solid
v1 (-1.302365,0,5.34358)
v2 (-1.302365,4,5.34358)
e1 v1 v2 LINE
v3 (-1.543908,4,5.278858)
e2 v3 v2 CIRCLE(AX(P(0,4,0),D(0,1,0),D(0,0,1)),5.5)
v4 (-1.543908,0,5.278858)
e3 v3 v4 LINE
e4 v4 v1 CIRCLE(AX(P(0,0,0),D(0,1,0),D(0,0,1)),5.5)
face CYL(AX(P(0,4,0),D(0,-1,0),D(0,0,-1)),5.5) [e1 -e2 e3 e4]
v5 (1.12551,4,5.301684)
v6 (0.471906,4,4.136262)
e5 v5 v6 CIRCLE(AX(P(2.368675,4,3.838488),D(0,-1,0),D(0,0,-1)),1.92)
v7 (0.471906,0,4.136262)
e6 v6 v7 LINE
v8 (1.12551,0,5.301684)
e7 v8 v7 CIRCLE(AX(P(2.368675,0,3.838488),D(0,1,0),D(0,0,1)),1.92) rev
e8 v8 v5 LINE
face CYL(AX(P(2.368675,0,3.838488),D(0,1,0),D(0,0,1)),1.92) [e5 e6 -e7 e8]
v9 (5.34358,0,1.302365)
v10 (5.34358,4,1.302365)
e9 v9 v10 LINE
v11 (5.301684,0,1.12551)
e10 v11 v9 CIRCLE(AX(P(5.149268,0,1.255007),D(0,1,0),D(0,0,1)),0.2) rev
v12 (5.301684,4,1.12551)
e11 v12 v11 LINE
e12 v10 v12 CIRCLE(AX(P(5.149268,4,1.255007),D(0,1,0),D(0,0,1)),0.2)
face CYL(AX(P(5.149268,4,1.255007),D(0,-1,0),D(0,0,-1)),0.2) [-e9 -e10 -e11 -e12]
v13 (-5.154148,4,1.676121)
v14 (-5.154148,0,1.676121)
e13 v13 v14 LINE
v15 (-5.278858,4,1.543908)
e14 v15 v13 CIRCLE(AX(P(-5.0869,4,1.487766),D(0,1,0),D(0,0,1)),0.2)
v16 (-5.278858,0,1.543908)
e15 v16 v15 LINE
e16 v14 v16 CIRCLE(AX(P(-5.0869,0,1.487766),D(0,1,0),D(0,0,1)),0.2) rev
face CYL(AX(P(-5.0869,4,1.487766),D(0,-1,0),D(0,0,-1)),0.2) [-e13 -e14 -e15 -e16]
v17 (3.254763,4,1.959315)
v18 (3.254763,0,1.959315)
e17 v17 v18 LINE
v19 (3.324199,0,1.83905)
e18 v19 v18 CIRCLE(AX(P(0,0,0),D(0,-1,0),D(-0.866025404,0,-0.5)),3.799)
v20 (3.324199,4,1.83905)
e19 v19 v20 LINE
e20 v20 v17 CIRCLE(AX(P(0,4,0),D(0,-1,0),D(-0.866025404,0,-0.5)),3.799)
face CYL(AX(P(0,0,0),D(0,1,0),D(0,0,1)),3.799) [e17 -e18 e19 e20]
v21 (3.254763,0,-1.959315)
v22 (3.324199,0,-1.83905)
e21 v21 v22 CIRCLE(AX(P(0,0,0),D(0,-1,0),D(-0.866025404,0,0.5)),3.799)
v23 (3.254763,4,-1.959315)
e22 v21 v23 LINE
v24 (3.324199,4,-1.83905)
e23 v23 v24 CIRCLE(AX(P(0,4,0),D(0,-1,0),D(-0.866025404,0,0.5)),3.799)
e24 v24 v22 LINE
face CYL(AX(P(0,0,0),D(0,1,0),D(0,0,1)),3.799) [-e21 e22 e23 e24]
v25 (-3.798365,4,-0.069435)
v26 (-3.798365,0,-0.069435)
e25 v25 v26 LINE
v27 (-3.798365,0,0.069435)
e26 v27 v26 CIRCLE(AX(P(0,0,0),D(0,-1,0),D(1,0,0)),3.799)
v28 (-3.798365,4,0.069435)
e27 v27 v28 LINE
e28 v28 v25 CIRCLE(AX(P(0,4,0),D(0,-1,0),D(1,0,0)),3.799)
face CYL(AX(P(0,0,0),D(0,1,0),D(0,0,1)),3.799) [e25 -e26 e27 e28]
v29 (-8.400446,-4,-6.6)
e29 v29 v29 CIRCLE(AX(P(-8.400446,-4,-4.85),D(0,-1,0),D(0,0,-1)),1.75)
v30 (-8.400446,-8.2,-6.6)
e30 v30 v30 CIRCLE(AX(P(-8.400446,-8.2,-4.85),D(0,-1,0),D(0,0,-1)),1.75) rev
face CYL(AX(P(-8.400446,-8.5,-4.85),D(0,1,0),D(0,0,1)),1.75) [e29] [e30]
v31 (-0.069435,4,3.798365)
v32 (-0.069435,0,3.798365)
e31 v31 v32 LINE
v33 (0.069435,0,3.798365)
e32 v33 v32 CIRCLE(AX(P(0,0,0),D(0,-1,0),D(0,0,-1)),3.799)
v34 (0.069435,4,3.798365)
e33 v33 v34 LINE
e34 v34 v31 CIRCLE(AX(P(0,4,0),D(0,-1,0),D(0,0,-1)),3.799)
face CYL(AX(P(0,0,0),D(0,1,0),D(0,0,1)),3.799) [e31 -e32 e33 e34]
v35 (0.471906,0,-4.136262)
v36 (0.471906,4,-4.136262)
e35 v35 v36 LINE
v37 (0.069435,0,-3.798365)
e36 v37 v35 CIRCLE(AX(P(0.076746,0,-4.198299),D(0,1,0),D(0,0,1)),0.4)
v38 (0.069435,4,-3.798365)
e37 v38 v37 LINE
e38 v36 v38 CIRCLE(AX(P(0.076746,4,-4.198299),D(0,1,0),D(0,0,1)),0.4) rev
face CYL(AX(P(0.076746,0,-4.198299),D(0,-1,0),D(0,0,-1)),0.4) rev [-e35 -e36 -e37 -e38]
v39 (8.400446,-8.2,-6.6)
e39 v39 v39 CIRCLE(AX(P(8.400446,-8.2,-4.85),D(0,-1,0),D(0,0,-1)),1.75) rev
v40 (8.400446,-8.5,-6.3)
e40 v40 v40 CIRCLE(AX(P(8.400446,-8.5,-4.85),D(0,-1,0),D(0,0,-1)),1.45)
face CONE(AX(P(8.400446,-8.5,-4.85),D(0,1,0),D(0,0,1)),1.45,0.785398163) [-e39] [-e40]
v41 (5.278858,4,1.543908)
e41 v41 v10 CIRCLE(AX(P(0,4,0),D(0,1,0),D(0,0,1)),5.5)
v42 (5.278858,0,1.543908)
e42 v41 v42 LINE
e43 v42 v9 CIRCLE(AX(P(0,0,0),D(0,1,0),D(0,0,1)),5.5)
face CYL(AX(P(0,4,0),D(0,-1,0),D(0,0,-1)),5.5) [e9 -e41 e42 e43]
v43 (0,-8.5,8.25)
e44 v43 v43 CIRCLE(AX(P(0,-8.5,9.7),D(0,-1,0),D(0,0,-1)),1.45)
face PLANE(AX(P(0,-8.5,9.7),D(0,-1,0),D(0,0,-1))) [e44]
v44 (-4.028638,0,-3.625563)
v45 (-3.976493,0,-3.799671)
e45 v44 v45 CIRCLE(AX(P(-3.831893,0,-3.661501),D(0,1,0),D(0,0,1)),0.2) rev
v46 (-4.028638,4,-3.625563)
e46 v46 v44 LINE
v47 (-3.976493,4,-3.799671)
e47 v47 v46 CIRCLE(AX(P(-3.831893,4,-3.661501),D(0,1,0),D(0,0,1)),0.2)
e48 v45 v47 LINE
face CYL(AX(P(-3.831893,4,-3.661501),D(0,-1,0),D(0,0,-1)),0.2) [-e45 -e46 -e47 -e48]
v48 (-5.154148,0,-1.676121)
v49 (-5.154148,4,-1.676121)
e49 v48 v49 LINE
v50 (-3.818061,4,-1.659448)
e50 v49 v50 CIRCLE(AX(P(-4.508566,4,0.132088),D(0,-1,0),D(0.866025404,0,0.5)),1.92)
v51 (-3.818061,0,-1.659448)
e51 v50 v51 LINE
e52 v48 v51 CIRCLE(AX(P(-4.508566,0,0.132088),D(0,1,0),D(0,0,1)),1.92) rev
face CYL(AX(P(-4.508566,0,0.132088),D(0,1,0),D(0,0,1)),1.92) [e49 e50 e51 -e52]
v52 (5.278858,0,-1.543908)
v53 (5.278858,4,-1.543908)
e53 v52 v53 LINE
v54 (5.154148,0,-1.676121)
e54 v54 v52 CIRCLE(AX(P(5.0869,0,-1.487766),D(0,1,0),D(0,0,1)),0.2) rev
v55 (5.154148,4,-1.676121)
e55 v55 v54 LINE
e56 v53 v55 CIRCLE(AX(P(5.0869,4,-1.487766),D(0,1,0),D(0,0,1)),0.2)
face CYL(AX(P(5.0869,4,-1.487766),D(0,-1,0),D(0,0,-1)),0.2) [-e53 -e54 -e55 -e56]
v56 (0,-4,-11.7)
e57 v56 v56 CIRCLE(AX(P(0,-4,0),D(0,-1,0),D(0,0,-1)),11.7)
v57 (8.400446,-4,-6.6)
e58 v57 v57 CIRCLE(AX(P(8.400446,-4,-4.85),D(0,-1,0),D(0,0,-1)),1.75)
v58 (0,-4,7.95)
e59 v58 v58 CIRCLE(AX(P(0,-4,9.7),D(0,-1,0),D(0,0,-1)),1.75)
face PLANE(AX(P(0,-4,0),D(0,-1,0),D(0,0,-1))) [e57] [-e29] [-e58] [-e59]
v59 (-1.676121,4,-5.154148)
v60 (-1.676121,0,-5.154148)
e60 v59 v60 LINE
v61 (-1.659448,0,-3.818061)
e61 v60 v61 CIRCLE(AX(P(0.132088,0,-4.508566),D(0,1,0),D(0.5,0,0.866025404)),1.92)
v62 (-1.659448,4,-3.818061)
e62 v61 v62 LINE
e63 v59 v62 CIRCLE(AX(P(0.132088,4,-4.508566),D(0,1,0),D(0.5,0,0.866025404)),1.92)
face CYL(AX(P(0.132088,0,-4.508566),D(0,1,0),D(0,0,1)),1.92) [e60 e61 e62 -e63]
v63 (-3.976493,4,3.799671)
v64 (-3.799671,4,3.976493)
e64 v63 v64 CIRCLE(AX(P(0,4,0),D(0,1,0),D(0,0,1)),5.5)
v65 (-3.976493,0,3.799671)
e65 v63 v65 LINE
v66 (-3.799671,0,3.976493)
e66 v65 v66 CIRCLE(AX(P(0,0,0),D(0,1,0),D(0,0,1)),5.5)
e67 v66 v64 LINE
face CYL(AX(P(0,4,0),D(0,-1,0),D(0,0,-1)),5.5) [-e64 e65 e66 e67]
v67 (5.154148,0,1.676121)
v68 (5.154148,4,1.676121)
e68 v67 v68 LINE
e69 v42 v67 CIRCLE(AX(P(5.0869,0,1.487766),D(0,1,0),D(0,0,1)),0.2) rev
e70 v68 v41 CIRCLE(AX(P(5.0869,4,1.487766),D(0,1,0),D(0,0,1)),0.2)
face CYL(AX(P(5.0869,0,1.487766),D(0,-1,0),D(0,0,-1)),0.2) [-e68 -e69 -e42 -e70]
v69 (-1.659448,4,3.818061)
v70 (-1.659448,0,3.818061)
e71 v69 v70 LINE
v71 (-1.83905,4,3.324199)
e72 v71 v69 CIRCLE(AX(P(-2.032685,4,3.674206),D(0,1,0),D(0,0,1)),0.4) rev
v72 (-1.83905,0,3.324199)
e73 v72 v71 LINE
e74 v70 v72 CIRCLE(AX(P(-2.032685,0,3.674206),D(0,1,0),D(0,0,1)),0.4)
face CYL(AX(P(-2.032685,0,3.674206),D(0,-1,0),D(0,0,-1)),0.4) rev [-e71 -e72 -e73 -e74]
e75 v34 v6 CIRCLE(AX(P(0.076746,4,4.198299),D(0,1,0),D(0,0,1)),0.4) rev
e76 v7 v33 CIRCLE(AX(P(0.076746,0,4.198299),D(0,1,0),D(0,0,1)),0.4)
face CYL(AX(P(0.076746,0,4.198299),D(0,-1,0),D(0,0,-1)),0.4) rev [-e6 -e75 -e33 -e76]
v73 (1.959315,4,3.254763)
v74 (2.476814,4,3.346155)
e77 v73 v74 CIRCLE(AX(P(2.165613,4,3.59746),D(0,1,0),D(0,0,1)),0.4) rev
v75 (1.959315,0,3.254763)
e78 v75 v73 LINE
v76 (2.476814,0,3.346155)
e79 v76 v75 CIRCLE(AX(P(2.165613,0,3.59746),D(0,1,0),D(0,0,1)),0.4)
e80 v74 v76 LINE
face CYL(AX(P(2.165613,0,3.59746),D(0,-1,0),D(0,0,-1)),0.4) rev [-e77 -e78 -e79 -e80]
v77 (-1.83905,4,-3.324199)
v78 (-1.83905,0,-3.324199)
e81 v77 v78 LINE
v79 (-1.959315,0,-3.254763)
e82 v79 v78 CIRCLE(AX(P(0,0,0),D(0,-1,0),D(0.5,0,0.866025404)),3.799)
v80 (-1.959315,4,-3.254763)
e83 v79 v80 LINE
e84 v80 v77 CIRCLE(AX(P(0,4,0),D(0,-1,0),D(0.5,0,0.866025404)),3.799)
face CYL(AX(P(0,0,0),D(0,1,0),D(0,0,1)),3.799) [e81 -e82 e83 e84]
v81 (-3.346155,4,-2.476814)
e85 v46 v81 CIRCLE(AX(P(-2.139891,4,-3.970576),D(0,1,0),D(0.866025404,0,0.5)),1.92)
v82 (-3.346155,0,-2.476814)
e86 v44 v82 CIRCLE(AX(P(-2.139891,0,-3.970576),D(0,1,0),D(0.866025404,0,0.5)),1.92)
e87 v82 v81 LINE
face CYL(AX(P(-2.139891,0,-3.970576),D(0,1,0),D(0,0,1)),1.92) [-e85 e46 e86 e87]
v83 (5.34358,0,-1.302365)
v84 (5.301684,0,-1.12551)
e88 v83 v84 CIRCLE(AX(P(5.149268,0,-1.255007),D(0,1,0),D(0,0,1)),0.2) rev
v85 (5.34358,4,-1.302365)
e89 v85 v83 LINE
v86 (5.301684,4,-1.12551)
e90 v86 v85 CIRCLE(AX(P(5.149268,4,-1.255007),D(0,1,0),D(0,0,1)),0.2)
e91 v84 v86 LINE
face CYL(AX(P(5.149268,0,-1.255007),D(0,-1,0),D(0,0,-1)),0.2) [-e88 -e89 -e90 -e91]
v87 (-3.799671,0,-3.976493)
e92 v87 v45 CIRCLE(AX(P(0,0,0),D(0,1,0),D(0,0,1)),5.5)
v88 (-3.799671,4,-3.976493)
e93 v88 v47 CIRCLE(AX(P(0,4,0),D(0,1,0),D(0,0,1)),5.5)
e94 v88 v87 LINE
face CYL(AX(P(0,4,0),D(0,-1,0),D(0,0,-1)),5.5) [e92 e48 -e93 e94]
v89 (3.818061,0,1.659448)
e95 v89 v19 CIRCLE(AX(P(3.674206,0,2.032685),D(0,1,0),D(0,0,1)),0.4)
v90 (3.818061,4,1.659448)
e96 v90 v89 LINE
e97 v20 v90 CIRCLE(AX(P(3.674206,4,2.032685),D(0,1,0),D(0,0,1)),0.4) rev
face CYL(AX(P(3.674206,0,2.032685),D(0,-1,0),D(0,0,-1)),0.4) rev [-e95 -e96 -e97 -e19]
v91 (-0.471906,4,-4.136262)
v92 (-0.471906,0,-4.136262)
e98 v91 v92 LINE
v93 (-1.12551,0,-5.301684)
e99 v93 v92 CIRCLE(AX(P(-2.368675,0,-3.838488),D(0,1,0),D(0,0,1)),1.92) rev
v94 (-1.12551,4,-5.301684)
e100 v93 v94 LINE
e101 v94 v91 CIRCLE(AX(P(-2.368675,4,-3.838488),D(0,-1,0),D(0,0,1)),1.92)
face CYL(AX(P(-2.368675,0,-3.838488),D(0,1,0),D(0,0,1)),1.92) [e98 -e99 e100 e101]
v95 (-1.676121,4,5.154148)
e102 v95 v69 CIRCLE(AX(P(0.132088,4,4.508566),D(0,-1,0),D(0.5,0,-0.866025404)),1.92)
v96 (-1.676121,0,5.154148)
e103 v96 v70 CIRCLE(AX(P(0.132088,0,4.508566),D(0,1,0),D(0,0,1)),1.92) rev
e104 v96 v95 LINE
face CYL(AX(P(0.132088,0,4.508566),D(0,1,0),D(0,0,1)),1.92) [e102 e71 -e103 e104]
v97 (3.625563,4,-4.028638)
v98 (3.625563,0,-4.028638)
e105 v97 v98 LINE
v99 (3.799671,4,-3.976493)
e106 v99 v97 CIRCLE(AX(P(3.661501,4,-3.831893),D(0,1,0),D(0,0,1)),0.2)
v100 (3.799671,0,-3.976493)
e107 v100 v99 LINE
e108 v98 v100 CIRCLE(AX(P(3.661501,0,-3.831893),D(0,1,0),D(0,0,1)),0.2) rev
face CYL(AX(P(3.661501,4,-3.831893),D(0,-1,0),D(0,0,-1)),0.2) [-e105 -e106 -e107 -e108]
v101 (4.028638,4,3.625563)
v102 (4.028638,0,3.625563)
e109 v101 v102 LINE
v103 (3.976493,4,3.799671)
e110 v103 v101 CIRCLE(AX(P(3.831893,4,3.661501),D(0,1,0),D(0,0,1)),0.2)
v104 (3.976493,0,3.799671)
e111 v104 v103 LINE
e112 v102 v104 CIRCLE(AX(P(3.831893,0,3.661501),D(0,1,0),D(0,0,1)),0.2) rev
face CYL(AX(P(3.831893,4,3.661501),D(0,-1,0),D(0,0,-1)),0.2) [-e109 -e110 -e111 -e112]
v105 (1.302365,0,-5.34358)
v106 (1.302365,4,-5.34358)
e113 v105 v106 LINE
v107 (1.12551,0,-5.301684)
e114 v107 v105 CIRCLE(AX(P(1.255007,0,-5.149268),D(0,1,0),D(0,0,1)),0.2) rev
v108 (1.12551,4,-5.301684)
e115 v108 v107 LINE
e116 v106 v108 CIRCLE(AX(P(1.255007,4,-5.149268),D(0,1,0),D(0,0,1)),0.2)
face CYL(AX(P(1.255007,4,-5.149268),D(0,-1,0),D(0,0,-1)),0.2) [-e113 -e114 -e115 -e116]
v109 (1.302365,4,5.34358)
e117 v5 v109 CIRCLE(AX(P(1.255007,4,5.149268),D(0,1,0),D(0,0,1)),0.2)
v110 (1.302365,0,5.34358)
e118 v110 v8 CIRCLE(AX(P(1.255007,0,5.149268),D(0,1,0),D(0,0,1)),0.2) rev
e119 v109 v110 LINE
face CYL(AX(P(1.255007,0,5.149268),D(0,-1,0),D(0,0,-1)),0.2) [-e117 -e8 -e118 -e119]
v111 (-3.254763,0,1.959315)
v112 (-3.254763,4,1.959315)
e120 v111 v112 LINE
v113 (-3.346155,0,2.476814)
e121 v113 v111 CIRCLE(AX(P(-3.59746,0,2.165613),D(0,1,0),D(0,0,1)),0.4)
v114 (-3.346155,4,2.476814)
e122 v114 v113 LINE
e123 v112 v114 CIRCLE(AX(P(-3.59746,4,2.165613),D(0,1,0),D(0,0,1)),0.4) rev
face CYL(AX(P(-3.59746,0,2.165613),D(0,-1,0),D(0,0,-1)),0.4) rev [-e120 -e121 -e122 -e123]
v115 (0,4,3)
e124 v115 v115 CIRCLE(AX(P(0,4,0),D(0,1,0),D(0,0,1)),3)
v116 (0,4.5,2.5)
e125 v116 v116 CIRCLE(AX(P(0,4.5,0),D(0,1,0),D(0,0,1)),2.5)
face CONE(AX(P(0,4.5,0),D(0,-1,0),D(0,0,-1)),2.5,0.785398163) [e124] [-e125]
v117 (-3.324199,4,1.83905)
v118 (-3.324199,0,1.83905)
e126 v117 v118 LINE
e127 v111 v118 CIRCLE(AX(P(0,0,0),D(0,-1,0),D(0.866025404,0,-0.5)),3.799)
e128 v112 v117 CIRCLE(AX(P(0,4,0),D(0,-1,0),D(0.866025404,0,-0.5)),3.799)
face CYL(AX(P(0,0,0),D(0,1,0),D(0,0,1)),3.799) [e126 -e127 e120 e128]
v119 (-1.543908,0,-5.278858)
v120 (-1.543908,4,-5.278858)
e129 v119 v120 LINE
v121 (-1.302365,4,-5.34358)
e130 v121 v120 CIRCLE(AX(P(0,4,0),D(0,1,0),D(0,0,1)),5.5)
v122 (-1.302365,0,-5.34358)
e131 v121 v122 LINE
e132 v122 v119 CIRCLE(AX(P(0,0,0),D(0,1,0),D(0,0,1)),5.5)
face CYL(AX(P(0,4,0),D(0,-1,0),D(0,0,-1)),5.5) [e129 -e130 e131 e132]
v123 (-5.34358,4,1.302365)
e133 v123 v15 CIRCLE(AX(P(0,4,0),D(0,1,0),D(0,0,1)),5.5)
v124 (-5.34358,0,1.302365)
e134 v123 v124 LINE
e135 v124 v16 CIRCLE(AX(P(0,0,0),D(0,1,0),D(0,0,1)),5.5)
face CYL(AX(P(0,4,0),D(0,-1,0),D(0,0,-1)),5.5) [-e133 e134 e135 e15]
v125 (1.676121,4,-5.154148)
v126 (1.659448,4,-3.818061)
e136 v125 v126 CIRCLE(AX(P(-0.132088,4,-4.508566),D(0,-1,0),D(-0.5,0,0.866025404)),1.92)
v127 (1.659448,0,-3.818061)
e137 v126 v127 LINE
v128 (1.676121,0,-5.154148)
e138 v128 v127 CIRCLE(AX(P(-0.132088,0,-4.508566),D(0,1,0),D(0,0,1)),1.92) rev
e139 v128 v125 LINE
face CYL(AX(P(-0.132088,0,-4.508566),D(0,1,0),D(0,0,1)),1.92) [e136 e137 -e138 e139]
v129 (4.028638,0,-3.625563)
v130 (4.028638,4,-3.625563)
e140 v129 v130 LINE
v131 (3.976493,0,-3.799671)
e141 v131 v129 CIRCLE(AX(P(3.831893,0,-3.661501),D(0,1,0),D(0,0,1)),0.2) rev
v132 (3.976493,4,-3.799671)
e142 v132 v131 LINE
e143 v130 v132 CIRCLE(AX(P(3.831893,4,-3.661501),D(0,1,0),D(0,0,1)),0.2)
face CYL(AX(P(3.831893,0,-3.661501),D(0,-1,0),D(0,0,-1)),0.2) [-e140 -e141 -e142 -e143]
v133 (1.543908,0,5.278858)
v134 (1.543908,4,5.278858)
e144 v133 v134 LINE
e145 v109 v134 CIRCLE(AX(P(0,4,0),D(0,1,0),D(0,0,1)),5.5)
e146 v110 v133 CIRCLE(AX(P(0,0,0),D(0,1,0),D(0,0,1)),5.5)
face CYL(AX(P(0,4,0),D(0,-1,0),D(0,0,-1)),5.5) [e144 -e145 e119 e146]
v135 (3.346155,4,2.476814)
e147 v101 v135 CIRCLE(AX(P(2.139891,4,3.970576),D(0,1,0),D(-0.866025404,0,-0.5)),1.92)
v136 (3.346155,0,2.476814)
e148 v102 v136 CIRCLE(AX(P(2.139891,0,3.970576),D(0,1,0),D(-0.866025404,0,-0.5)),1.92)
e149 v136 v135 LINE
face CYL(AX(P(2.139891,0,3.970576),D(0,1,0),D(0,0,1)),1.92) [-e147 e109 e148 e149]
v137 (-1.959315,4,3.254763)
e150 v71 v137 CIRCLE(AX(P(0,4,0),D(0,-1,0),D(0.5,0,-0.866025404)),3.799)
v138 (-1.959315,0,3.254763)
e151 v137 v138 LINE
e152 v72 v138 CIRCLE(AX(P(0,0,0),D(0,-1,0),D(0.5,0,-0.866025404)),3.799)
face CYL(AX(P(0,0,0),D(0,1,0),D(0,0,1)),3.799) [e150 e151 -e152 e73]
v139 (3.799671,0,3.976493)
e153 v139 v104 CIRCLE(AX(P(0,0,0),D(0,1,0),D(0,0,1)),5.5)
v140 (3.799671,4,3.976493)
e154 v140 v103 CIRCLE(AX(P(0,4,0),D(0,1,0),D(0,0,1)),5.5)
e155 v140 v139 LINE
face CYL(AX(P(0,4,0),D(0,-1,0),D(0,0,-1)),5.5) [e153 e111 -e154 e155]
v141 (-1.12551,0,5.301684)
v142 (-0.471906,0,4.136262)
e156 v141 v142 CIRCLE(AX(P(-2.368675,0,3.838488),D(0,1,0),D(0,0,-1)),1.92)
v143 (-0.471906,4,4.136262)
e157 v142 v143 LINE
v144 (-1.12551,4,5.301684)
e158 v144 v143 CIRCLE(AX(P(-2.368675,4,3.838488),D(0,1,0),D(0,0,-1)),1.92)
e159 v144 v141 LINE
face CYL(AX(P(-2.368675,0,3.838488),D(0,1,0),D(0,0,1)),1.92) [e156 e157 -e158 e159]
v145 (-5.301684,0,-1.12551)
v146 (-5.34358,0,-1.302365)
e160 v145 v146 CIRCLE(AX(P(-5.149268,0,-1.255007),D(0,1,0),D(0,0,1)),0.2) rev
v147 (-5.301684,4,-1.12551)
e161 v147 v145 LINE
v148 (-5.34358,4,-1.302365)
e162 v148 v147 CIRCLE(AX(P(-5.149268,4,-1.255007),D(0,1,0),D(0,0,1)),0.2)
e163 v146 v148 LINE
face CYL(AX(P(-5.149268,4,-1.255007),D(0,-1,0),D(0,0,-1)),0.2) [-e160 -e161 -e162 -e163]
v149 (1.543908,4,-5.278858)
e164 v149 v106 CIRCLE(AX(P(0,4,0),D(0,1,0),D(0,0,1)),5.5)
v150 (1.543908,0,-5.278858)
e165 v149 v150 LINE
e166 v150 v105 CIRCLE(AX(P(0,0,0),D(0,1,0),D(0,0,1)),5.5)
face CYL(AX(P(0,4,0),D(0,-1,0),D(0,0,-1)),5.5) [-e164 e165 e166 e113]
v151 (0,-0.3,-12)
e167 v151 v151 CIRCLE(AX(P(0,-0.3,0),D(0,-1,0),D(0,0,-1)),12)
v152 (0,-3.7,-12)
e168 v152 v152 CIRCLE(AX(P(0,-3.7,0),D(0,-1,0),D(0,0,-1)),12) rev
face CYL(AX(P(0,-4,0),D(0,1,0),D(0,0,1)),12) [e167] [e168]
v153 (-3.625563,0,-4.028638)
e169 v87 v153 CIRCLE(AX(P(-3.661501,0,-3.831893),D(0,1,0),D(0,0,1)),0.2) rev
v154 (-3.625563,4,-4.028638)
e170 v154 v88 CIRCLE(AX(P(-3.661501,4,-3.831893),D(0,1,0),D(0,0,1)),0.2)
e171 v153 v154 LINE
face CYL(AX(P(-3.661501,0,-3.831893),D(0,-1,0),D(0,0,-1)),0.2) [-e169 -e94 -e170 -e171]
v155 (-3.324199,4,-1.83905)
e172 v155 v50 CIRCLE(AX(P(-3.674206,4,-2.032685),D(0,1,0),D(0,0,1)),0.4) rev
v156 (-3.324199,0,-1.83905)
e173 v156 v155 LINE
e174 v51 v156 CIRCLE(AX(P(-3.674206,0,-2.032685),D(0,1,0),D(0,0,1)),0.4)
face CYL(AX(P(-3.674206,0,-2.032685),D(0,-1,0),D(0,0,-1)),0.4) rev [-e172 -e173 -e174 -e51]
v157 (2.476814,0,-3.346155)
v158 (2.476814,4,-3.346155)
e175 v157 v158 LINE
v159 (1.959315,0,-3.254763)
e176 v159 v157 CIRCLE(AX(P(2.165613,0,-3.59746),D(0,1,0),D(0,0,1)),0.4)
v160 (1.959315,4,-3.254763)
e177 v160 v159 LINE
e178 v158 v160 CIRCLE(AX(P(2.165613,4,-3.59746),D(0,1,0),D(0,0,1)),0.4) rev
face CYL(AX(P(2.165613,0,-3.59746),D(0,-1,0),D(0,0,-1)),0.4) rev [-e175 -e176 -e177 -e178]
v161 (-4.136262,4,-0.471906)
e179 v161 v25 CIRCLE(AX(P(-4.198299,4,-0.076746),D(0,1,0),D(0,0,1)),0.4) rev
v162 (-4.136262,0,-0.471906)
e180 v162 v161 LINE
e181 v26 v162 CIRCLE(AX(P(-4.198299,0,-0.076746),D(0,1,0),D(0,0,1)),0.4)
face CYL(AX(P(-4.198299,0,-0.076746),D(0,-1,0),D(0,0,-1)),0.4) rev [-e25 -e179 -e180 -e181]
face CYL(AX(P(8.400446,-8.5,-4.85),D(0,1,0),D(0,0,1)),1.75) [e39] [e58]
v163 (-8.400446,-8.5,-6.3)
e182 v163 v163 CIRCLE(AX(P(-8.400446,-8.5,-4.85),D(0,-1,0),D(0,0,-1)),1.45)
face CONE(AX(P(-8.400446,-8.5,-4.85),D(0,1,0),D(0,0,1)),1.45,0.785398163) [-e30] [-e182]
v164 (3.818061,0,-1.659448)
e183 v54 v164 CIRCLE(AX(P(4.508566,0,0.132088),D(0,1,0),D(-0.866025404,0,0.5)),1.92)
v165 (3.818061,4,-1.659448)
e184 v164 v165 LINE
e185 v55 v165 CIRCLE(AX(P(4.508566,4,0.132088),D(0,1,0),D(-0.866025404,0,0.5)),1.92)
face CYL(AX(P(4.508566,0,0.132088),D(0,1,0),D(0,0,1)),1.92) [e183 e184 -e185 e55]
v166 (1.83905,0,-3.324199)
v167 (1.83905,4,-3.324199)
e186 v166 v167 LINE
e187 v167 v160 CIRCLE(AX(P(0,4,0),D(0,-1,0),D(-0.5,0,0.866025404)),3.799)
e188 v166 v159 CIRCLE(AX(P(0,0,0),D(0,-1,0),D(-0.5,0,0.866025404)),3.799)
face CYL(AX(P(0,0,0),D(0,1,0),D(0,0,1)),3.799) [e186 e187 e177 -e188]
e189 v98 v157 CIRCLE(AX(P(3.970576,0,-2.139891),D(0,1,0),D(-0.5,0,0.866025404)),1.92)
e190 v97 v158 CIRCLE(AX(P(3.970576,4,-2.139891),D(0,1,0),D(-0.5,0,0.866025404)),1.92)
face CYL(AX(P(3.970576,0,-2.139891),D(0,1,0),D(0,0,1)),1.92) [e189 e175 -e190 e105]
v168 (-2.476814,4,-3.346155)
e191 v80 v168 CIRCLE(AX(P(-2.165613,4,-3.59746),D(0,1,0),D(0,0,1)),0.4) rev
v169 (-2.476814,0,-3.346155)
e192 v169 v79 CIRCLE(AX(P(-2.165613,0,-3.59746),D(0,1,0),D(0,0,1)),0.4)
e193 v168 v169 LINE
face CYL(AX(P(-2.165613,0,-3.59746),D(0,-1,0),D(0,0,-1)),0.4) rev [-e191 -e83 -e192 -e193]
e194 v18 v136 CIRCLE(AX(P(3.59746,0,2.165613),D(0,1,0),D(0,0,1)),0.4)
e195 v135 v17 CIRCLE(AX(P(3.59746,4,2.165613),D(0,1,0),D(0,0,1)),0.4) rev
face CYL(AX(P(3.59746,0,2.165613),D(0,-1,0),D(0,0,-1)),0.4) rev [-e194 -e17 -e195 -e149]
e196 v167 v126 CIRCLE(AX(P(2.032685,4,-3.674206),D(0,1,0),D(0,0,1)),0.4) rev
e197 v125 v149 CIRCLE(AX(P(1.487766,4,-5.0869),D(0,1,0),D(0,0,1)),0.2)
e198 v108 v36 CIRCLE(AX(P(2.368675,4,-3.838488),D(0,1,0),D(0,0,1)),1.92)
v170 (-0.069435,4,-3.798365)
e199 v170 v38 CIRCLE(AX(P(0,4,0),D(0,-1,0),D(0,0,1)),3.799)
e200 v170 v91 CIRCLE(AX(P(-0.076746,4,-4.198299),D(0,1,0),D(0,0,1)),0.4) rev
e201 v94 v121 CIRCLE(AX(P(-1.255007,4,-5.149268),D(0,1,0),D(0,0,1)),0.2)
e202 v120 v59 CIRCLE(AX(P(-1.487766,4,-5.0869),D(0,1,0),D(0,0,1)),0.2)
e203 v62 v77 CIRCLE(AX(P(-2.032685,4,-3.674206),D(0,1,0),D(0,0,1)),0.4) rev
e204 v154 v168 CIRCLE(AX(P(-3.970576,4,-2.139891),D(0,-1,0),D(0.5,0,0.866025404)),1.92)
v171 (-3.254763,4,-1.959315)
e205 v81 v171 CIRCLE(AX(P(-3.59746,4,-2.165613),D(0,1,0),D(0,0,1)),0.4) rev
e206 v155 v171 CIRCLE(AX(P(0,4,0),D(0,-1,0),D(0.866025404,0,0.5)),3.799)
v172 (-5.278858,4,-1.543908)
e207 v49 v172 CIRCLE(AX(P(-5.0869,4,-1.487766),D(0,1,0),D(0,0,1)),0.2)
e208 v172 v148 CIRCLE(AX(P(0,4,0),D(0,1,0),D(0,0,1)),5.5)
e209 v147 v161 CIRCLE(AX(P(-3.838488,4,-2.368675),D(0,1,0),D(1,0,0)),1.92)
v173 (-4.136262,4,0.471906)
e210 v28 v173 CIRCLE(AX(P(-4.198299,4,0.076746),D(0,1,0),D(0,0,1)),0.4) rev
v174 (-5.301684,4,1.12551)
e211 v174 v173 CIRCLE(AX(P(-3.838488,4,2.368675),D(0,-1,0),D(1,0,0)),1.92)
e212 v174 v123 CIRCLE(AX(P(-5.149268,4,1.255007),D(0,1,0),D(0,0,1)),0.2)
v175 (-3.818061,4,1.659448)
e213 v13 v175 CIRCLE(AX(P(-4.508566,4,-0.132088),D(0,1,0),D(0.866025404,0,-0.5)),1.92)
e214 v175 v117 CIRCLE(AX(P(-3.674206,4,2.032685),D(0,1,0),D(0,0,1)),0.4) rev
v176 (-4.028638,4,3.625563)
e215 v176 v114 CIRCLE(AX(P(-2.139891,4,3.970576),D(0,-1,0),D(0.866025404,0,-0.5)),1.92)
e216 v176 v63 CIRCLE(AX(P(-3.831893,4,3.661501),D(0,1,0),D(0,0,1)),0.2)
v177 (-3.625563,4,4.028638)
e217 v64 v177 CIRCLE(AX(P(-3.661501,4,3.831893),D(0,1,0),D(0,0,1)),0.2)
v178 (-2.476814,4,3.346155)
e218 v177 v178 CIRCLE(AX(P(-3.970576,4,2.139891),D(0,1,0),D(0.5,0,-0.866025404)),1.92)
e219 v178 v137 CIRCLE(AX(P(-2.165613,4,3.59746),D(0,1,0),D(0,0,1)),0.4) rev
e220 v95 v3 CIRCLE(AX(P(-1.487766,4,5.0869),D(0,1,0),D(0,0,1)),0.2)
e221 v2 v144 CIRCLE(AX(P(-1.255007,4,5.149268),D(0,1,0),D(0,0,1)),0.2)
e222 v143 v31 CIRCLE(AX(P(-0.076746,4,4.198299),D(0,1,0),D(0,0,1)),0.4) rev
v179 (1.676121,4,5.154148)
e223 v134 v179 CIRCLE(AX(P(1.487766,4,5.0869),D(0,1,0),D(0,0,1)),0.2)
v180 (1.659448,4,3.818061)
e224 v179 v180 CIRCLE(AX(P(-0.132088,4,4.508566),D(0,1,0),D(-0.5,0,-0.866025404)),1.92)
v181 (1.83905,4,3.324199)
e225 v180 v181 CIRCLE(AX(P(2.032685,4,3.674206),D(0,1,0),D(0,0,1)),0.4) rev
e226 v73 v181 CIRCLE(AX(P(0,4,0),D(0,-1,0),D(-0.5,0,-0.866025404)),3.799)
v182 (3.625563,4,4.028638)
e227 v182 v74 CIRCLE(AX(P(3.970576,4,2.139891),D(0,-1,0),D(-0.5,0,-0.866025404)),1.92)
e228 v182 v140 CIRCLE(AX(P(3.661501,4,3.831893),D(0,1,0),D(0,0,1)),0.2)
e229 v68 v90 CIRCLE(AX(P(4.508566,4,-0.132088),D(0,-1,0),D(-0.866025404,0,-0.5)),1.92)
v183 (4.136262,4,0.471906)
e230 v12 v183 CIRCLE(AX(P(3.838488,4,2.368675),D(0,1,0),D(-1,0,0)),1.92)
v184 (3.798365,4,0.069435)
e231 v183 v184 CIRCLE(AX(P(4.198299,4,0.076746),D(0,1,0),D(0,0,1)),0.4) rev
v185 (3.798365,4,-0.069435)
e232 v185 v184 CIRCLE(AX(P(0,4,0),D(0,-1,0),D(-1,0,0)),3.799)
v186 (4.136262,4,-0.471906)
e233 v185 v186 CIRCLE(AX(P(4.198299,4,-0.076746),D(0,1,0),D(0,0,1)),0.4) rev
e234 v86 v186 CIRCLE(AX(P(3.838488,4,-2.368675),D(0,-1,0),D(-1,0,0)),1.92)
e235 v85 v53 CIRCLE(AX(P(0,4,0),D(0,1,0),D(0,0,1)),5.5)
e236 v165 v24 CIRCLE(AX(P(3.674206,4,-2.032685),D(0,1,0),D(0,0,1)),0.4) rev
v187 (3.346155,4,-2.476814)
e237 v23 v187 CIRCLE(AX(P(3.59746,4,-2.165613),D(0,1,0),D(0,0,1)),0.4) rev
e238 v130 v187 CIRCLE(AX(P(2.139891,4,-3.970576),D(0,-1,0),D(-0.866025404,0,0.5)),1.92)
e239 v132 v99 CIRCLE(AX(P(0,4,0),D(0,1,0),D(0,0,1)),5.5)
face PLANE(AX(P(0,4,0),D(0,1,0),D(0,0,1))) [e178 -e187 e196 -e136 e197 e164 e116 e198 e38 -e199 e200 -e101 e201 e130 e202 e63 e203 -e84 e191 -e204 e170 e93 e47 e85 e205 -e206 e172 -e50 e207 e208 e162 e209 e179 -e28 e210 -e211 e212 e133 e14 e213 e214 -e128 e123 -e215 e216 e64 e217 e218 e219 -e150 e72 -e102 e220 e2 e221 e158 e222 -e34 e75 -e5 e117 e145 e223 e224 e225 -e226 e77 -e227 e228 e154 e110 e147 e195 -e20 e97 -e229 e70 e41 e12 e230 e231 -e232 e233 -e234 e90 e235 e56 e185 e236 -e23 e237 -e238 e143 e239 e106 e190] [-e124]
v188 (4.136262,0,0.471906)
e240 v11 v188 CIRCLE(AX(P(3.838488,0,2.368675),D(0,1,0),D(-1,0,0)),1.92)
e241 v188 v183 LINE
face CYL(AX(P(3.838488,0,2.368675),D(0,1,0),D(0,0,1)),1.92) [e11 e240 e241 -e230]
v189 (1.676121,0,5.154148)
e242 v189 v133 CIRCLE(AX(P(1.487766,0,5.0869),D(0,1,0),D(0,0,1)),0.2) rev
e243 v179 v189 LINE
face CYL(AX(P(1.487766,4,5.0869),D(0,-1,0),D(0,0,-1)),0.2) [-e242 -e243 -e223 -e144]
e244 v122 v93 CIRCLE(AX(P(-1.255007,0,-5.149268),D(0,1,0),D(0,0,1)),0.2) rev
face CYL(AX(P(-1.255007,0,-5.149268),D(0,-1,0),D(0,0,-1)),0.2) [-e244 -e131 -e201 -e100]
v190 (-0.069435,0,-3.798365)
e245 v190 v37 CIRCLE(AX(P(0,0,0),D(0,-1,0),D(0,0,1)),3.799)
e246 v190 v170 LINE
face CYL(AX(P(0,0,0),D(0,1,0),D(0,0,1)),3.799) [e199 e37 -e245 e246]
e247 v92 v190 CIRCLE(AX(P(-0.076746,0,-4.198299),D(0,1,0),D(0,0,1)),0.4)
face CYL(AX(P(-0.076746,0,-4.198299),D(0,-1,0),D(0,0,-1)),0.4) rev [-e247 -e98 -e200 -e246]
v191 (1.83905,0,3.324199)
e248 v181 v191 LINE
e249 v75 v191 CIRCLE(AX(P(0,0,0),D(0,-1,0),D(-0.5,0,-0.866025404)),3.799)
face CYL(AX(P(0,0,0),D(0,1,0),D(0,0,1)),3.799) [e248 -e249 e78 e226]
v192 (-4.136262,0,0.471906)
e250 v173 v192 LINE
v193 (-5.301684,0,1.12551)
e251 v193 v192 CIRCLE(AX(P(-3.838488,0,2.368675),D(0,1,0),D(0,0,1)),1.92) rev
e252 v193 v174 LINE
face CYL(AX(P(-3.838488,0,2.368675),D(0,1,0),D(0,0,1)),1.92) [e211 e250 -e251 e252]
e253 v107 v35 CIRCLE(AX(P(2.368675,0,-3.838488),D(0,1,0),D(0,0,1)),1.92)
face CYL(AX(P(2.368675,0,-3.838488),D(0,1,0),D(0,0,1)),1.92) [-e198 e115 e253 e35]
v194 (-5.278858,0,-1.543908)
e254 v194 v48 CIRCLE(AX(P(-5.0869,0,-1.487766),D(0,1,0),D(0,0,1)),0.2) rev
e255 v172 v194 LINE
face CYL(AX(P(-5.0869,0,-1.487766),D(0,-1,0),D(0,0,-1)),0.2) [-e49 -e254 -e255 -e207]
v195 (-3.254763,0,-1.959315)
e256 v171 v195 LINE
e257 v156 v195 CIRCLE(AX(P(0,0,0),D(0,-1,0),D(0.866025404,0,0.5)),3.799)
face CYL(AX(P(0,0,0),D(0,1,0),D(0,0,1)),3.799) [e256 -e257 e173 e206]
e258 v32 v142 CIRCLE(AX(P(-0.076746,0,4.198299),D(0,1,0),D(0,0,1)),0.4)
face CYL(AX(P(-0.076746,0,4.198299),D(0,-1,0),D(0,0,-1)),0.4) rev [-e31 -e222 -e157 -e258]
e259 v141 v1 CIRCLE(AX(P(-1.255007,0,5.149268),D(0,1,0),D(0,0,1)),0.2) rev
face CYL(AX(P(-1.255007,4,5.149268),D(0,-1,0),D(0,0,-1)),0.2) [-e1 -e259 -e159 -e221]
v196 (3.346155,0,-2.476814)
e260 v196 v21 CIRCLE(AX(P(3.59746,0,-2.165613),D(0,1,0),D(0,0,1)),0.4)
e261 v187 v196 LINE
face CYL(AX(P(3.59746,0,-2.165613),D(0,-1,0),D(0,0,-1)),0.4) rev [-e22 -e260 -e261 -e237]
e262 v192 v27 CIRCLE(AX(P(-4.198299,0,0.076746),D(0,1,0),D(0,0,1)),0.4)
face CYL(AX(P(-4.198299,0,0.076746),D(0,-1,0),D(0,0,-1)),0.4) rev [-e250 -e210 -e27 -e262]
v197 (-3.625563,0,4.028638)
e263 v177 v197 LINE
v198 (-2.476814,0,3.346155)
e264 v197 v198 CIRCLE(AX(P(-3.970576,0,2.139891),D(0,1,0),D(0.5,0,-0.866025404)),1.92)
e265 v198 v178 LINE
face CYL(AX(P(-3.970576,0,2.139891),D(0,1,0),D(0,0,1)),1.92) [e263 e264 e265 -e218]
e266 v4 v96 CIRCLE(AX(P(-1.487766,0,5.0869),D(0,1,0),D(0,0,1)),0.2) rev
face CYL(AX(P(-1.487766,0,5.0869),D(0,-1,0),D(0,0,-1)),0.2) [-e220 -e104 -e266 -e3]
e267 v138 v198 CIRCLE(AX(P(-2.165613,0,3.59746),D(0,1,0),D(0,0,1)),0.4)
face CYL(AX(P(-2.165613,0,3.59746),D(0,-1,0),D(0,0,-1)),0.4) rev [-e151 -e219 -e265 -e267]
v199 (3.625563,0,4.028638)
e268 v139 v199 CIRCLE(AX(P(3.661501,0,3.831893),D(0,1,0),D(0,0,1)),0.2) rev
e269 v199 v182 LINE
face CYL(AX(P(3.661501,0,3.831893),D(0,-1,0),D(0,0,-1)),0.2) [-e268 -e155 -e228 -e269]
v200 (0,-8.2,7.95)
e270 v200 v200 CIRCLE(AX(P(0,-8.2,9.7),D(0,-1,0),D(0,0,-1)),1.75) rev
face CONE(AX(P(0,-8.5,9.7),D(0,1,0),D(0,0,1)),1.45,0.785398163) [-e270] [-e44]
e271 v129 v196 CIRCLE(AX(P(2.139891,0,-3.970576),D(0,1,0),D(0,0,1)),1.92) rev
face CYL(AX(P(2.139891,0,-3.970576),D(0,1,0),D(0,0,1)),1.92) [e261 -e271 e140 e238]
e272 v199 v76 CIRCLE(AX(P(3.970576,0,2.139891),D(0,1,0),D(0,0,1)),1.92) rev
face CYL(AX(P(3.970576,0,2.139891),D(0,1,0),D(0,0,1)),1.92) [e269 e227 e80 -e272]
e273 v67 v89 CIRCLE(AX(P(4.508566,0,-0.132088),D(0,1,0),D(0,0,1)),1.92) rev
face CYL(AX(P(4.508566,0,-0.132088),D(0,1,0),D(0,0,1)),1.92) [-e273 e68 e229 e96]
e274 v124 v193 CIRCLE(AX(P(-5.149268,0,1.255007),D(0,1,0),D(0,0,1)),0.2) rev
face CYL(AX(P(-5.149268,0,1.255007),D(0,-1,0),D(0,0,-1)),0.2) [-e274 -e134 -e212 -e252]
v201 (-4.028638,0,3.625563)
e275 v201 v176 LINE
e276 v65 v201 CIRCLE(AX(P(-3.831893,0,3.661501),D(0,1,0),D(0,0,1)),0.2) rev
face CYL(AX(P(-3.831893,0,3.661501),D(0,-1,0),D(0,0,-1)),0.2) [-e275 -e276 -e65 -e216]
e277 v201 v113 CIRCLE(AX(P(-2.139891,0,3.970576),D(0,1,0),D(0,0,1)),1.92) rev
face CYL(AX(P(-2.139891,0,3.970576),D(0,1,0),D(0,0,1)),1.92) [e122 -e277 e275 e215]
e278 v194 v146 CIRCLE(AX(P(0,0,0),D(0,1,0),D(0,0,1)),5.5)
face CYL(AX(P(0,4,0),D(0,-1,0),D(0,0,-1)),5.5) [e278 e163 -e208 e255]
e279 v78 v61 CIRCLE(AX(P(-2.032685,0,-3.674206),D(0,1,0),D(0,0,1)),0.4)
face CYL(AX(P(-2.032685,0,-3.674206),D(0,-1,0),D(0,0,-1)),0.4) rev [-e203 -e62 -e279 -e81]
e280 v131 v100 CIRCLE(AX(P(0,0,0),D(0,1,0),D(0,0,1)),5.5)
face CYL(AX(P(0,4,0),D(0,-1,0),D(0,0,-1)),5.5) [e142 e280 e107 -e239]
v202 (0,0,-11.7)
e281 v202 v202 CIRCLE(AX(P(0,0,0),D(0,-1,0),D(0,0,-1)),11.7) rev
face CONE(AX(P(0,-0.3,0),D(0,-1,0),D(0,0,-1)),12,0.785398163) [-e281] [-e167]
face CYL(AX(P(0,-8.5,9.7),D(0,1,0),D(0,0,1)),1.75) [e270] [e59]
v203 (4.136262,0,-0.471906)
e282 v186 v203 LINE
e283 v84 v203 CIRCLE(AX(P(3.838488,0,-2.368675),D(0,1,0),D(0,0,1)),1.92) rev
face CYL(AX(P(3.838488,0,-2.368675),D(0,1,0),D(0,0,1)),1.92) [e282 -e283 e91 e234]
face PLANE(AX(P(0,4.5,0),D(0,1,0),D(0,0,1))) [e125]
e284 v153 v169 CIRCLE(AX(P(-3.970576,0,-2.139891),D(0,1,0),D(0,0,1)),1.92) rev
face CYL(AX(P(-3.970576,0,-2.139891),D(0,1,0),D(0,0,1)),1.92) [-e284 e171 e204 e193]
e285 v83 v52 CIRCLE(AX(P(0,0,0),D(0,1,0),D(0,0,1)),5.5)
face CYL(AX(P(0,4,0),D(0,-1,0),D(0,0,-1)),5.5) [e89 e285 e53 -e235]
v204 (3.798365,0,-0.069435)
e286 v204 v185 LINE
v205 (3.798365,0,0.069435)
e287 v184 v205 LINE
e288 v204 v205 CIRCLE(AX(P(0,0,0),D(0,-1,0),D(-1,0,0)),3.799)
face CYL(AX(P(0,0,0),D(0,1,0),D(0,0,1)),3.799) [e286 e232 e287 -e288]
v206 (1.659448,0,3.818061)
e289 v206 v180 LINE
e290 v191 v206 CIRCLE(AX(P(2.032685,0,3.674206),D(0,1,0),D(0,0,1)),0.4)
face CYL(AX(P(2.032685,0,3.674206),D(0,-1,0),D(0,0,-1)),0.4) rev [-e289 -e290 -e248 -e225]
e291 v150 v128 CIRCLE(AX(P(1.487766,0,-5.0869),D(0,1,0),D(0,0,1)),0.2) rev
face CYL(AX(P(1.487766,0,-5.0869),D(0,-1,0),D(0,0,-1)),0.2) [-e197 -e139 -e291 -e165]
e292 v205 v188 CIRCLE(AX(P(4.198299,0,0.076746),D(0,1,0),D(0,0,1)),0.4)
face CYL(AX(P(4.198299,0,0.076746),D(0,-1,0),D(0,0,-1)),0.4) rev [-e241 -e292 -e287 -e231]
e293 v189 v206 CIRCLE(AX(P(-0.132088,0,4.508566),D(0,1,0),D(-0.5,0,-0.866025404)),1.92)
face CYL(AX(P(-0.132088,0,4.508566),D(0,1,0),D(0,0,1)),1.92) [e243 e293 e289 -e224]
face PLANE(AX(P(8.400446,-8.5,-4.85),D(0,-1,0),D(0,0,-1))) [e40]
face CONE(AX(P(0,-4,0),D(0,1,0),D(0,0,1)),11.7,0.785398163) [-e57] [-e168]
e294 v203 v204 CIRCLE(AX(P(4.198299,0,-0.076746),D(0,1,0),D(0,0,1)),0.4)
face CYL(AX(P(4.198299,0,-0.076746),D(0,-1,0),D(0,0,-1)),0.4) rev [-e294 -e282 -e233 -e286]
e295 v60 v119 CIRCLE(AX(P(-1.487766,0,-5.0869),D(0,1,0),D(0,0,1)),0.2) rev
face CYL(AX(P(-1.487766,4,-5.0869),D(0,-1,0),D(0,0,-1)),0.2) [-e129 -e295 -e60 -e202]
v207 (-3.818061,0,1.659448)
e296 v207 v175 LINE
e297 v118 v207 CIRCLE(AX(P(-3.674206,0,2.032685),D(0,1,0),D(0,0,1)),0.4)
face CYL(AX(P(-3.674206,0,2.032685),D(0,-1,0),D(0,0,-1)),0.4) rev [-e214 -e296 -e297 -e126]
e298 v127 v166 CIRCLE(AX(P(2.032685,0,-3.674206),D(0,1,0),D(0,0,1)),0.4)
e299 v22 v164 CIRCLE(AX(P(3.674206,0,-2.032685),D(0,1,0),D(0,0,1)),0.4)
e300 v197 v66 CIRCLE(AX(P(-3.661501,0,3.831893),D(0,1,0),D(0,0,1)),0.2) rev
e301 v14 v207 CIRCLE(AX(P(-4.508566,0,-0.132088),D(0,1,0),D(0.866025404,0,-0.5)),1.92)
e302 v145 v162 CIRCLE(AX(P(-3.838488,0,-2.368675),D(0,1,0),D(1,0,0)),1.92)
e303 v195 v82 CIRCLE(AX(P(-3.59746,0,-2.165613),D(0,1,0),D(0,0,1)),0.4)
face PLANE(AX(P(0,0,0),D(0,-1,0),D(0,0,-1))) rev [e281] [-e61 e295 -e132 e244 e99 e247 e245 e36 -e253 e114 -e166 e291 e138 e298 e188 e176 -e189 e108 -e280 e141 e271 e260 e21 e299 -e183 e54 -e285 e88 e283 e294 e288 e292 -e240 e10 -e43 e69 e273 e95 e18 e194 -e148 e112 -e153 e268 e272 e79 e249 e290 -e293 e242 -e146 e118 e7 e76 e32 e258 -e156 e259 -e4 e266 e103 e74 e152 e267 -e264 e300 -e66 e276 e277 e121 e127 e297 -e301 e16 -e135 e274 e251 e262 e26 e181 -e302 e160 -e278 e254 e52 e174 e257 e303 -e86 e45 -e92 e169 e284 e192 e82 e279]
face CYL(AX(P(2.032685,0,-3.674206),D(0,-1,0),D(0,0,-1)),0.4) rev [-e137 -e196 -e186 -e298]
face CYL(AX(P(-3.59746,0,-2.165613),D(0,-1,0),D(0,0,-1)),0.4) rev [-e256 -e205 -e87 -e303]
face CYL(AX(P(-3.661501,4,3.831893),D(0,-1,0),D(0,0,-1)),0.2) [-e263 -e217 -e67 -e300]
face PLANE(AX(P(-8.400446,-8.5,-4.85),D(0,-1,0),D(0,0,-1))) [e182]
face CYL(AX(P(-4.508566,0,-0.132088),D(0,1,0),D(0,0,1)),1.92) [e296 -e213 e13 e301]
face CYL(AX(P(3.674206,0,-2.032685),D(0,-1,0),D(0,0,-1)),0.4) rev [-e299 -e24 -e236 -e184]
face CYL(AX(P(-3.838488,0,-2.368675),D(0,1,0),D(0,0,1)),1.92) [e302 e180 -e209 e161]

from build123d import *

# Parameters (mm, degrees)
SKETCH1_R            = 5.5
BOSS_EXTRUDE1_DEPTH  = 4
CUT_EXTRUDE1_DEPTH   = 4
FILLET1_R            = 0.2
FILLET2_R            = 0.4
FILLET1_OF_MIRROR1_R = 0.2
FILLET2_OF_MIRROR1_R = 0.4
CIRPATTERN1_DEPTH    = 4
SKETCH3_R            = 3
BOSS_EXTRUDE2_DEPTH  = 0.5
CHAMFER1_SIZE        = 0.5
SKETCH4_R            = 12
BOSS_EXTRUDE3_DEPTH  = 4
SKETCH5_R            = 1.75
BOSS_EXTRUDE4_DEPTH  = 4.5
CHAMFER2_SIZE        = 0.3
CHAMFER3_SIZE        = 0.3


# Read off the part's stored shape, not the designer's step: CirPattern1
with BuildPart() as part:
    # Sketch1 → Boss-Extrude1 (new body)
    with BuildSketch(Plane(origin=(0, 0, 0), x_dir=(1, 0, 0), z_dir=(0, 1, 0))):
        with Locations(Location((0, 0, 0), (0, 0, 270))):
            Circle(SKETCH1_R)
    extrude(amount=BOSS_EXTRUDE1_DEPTH)

    # Sketch2 → Cut-Extrude1 (cut)
    with BuildSketch(Plane(origin=(0, 4, 0), x_dir=(1, 0, 0), z_dir=(0, 1, 0))):
        with BuildLine():
            Line((0, 3.799), (0, 7.477315916))
            Line((0, 7.477315916), (-1.717756705, 5.644784223))
            ThreePointArc((-1.717756705, 5.644784223), (-0.778860554, 4.915006115), (-0.449816676, 3.772275965))
            ThreePointArc((-0.449816676, 3.772275965), (-0.225304913, 3.792313106), (0, 3.799))
        make_face()
    cut_extrude1 = extrude(amount=-CUT_EXTRUDE1_DEPTH, mode=Mode.SUBTRACT)

    # Fillet1
    fillet1_edges = [part.edges().sort_by_distance(p)[0] for p in [
        (-1.205722077, 2, -5.366212284),
    ]]
    fillet(fillet1_edges, radius=FILLET1_R)

    # Fillet2
    fillet2_edges = [part.edges().sort_by_distance(p)[0] for p in [
        (-0.449816676, 2, -3.772275965),
    ]]
    fillet(fillet2_edges, radius=FILLET2_R)

    # Mirror1: Cut-Extrude1 across plane
    add(cut_extrude1.mirror(Plane.ZY), mode=Mode.SUBTRACT)

    # Fillet1 of Mirror1
    fillet1_of_mirror1_edges = [part.edges().sort_by_distance(p)[0] for p in [
        (1.205722077, 2, -5.366212284),
    ]]
    fillet(fillet1_of_mirror1_edges, radius=FILLET1_OF_MIRROR1_R)

    # Fillet2 of Mirror1
    fillet2_of_mirror1_edges = [part.edges().sort_by_distance(p)[0] for p in [
        (0.449816676, 2, -3.772275965),
    ]]
    fillet(fillet2_of_mirror1_edges, radius=FILLET2_OF_MIRROR1_R)

    # CirPattern1 outline → CirPattern1 (cut)
    with BuildSketch(Plane(origin=(0, 0, 0), x_dir=(1, 0, 0), z_dir=(0, 1, 0))):
        with BuildLine():
            ThreePointArc((3.62556251, 4.028637884), (3.71888228, 4.023485264), (3.799671329, 3.976493152))
            ThreePointArc((3.799671329, 3.976493152), (2.75, 4.76313972), (1.543908423, 5.278858473))
            ThreePointArc((1.543908423, 5.278858473), (1.62499931, 5.23238916), (1.676121495, 5.154148179))
            ThreePointArc((1.676121495, 5.154148179), (1.787762124, 4.48460755), (1.659448371, 3.81806133))
            ThreePointArc((1.659448371, 3.81806133), (1.656771541, 3.537498856), (1.839050027, 3.32419855))
            ThreePointArc((1.839050027, 3.32419855), (1.8995, 3.290030509), (1.959315378, 3.254763317))
            ThreePointArc((1.959315378, 3.254763317), (2.235178105, 3.203555671), (2.47681392, 3.34615511))
            ThreePointArc((2.47681392, 3.34615511), (2.989903003, 3.79055119), (3.62556251, 4.028637884))
        make_face()
        with BuildLine():
            ThreePointArc((5.154148179, 1.676121495), (5.23238916, 1.62499931), (5.278858473, 1.543908423))
            ThreePointArc((5.278858473, 1.543908423), (4.763139721, 2.75), (3.976493152, 3.799671329))
            ThreePointArc((3.976493152, 3.799671329), (4.023485264, 3.71888228), (4.028637884, 3.62556251))
            ThreePointArc((4.028637884, 3.62556251), (3.79055119, 2.989903003), (3.34615511, 2.47681392))
            ThreePointArc((3.34615511, 2.47681392), (3.203555671, 2.235178105), (3.254763317, 1.959315378))
            ThreePointArc((3.254763317, 1.959315378), (3.290030509, 1.8995), (3.32419855, 1.839050027))
            ThreePointArc((3.32419855, 1.839050027), (3.537498856, 1.656771541), (3.81806133, 1.659448371))
            ThreePointArc((3.81806133, 1.659448371), (4.48460755, 1.787762124), (5.154148179, 1.676121495))
        make_face()
        with BuildLine():
            ThreePointArc((5.301684005, -1.125510295), (5.34388159, -1.208903897), (5.343579752, -1.302365321))
            ThreePointArc((5.343579752, -1.302365321), (5.5, 0), (5.343579752, 1.302365321))
            ThreePointArc((5.343579752, 1.302365321), (5.34388159, 1.208903897), (5.301684005, 1.125510295))
            ThreePointArc((5.301684005, 1.125510295), (4.777665126, 0.69405636), (4.13626229, 0.47190622))
            ThreePointArc((4.13626229, 0.47190622), (3.891949646, 0.333943185), (3.798365405, 0.069435233))
            ThreePointArc((3.798365405, 0.069435233), (3.799, 0), (3.798365405, -0.069435233))
            ThreePointArc((3.798365405, -0.069435233), (3.891949646, -0.333943185), (4.13626229, -0.47190622))
            ThreePointArc((4.13626229, -0.47190622), (4.777665126, -0.69405636), (5.301684005, -1.125510295))
        make_face()
        with BuildLine():
            ThreePointArc((4.028637884, -3.62556251), (4.023485264, -3.71888228), (3.976493152, -3.799671329))
            ThreePointArc((3.976493152, -3.799671329), (4.763139721, -2.75), (5.278858473, -1.543908423))
            ThreePointArc((5.278858473, -1.543908423), (5.23238916, -1.62499931), (5.154148179, -1.676121495))
            ThreePointArc((5.154148179, -1.676121495), (4.48460755, -1.787762124), (3.81806133, -1.659448371))
            ThreePointArc((3.81806133, -1.659448371), (3.537498856, -1.656771541), (3.32419855, -1.839050027))
            ThreePointArc((3.32419855, -1.839050027), (3.290030509, -1.8995), (3.254763317, -1.959315378))
            ThreePointArc((3.254763317, -1.959315378), (3.203555671, -2.235178105), (3.34615511, -2.47681392))
            ThreePointArc((3.34615511, -2.47681392), (3.79055119, -2.989903003), (4.028637884, -3.62556251))
        make_face()
        with BuildLine():
            ThreePointArc((1.676121495, -5.154148179), (1.62499931, -5.23238916), (1.543908423, -5.278858473))
            ThreePointArc((1.543908423, -5.278858473), (2.75, -4.763139721), (3.799671329, -3.976493152))
            ThreePointArc((3.799671329, -3.976493152), (3.71888228, -4.023485264), (3.62556251, -4.028637884))
            ThreePointArc((3.62556251, -4.028637884), (2.989903003, -3.79055119), (2.47681392, -3.34615511))
            ThreePointArc((2.47681392, -3.34615511), (2.235178105, -3.203555671), (1.959315378, -3.254763317))
            ThreePointArc((1.959315378, -3.254763317), (1.8995, -3.290030509), (1.839050027, -3.32419855))
            ThreePointArc((1.839050027, -3.32419855), (1.656771541, -3.537498856), (1.659448371, -3.81806133))
            ThreePointArc((1.659448371, -3.81806133), (1.787762124, -4.48460755), (1.676121495, -5.154148179))
        make_face()
        with BuildLine():
            ThreePointArc((-1.125510295, -5.301684005), (-1.208903897, -5.34388159), (-1.302365321, -5.343579752))
            ThreePointArc((-1.302365321, -5.343579752), (0, -5.5), (1.302365321, -5.343579752))
            ThreePointArc((1.302365321, -5.343579752), (1.208903897, -5.34388159), (1.125510295, -5.301684005))
            ThreePointArc((1.125510295, -5.301684005), (0.69405636, -4.777665126), (0.47190622, -4.13626229))
            ThreePointArc((0.47190622, -4.13626229), (0.333943185, -3.891949646), (0.069435233, -3.798365405))
            ThreePointArc((0.069435233, -3.798365405), (0, -3.799), (-0.069435233, -3.798365405))
            ThreePointArc((-0.069435233, -3.798365405), (-0.333943185, -3.891949646), (-0.47190622, -4.13626229))
            ThreePointArc((-0.47190622, -4.13626229), (-0.69405636, -4.777665126), (-1.125510295, -5.301684005))
        make_face()
        with BuildLine():
            ThreePointArc((-3.62556251, -4.028637884), (-3.71888228, -4.023485264), (-3.799671329, -3.976493152))
            ThreePointArc((-3.799671329, -3.976493152), (-2.75, -4.763139721), (-1.543908423, -5.278858473))
            ThreePointArc((-1.543908423, -5.278858473), (-1.62499931, -5.23238916), (-1.676121495, -5.154148179))
            ThreePointArc((-1.676121495, -5.154148179), (-1.787762124, -4.48460755), (-1.659448371, -3.81806133))
            ThreePointArc((-1.659448371, -3.81806133), (-1.656771541, -3.537498856), (-1.839050027, -3.32419855))
            ThreePointArc((-1.839050027, -3.32419855), (-1.8995, -3.290030509), (-1.959315378, -3.254763317))
            ThreePointArc((-1.959315378, -3.254763317), (-2.235178105, -3.203555671), (-2.47681392, -3.34615511))
            ThreePointArc((-2.47681392, -3.34615511), (-2.989903003, -3.79055119), (-3.62556251, -4.028637884))
        make_face()
        with BuildLine():
            ThreePointArc((-5.154148179, -1.676121495), (-5.23238916, -1.62499931), (-5.278858473, -1.543908423))
            ThreePointArc((-5.278858473, -1.543908423), (-4.763139721, -2.75), (-3.976493152, -3.799671329))
            ThreePointArc((-3.976493152, -3.799671329), (-4.023485264, -3.71888228), (-4.028637884, -3.62556251))
            ThreePointArc((-4.028637884, -3.62556251), (-3.79055119, -2.989903003), (-3.34615511, -2.47681392))
            ThreePointArc((-3.34615511, -2.47681392), (-3.203555671, -2.235178105), (-3.254763317, -1.959315378))
            ThreePointArc((-3.254763317, -1.959315378), (-3.290030509, -1.8995), (-3.32419855, -1.839050027))
            ThreePointArc((-3.32419855, -1.839050027), (-3.537498856, -1.656771541), (-3.81806133, -1.659448371))
            ThreePointArc((-3.81806133, -1.659448371), (-4.48460755, -1.787762124), (-5.154148179, -1.676121495))
        make_face()
        with BuildLine():
            ThreePointArc((-5.301684005, 1.125510295), (-5.34388159, 1.208903897), (-5.343579752, 1.302365321))
            ThreePointArc((-5.343579752, 1.302365321), (-5.5, 0), (-5.343579752, -1.302365321))
            ThreePointArc((-5.343579752, -1.302365321), (-5.34388159, -1.208903897), (-5.301684005, -1.125510295))
            ThreePointArc((-5.301684005, -1.125510295), (-4.777665126, -0.69405636), (-4.13626229, -0.47190622))
            ThreePointArc((-4.13626229, -0.47190622), (-3.891949646, -0.333943185), (-3.798365405, -0.069435233))
            ThreePointArc((-3.798365405, -0.069435233), (-3.799, 0), (-3.798365405, 0.069435233))
            ThreePointArc((-3.798365405, 0.069435233), (-3.891949646, 0.333943185), (-4.13626229, 0.47190622))
            ThreePointArc((-4.13626229, 0.47190622), (-4.777665126, 0.69405636), (-5.301684005, 1.125510295))
        make_face()
        with BuildLine():
            ThreePointArc((-4.028637884, 3.62556251), (-4.023485264, 3.71888228), (-3.976493152, 3.799671329))
            ThreePointArc((-3.976493152, 3.799671329), (-4.763139721, 2.75), (-5.278858473, 1.543908423))
            ThreePointArc((-5.278858473, 1.543908423), (-5.23238916, 1.62499931), (-5.154148179, 1.676121495))
            ThreePointArc((-5.154148179, 1.676121495), (-4.48460755, 1.787762124), (-3.81806133, 1.659448371))
            ThreePointArc((-3.81806133, 1.659448371), (-3.537498856, 1.656771541), (-3.32419855, 1.839050027))
            ThreePointArc((-3.32419855, 1.839050027), (-3.290030509, 1.8995), (-3.254763317, 1.959315378))
            ThreePointArc((-3.254763317, 1.959315378), (-3.203555671, 2.235178105), (-3.34615511, 2.47681392))
            ThreePointArc((-3.34615511, 2.47681392), (-3.79055119, 2.989903003), (-4.028637884, 3.62556251))
        make_face()
        with BuildLine():
            ThreePointArc((-1.959315378, 3.254763317), (-1.8995, 3.290030509), (-1.839050027, 3.32419855))
            ThreePointArc((-1.839050027, 3.32419855), (-1.656771541, 3.537498856), (-1.659448371, 3.81806133))
            ThreePointArc((-1.659448371, 3.81806133), (-1.787762124, 4.48460755), (-1.676121495, 5.154148179))
            ThreePointArc((-1.676121495, 5.154148179), (-1.62499931, 5.23238916), (-1.543908423, 5.278858473))
            ThreePointArc((-1.543908423, 5.278858473), (-2.75, 4.76313972), (-3.799671329, 3.976493152))
            ThreePointArc((-3.799671329, 3.976493152), (-3.71888228, 4.023485264), (-3.62556251, 4.028637884))
            ThreePointArc((-3.62556251, 4.028637884), (-2.989903003, 3.79055119), (-2.47681392, 3.34615511))
            ThreePointArc((-2.47681392, 3.34615511), (-2.235178105, 3.203555671), (-1.959315378, 3.254763317))
        make_face()
    extrude(amount=CIRPATTERN1_DEPTH, mode=Mode.SUBTRACT)

    # Sketch3 → Boss-Extrude2 (add)
    with BuildSketch(Plane(origin=(0, 4, 0), x_dir=(1, 0, 0), z_dir=(0, 1, 0))):
        with Locations(Location((0, 0, 0), (0, 0, 270))):
            Circle(SKETCH3_R)
    extrude(amount=BOSS_EXTRUDE2_DEPTH)

    # Chamfer1
    chamfer1_edges = [part.edges().sort_by_distance(p)[0] for p in [
        (0, 4.5, -3),
    ]]
    chamfer(chamfer1_edges, length=CHAMFER1_SIZE - 0.0001)  # a hair under: the kernel refuses the full size

    # Sketch4 → Boss-Extrude3 (add)
    with BuildSketch(Plane.XZ):
        with Locations(Location((0, 0, 0), (0, 0, 270))):
            Circle(SKETCH4_R)
    extrude(amount=BOSS_EXTRUDE3_DEPTH)

    # Sketch5 → Boss-Extrude4 (add)
    with BuildSketch(Plane.XZ.offset(4)):
        with Locations(Location((0, 9.7, 0), (0, 0, 270))):
            Circle(SKETCH5_R)
        with Locations(Location((-8.400446417, -4.85, 0), (0, 0, 270))):
            Circle(SKETCH5_R)
        with Locations(Location((8.400446417, -4.85, 0), (0, 0, 270))):
            Circle(SKETCH5_R)
    extrude(amount=BOSS_EXTRUDE4_DEPTH)

    # Chamfer2
    chamfer2_edges = [part.edges().sort_by_distance(p)[0] for p in [
        (0, -8.5, 11.45),
        (-8.400446417, -8.5, -3.1),
        (8.400446417, -8.5, -3.1),
    ]]
    chamfer(chamfer2_edges, length=CHAMFER2_SIZE)

    # Chamfer3
    chamfer3_edges = [part.edges().sort_by_distance(p)[0] for p in [
        (0, 0, 12),
        (0, -4, 12),
    ]]
    chamfer(chamfer3_edges, length=CHAMFER3_SIZE)


solid = part.part
